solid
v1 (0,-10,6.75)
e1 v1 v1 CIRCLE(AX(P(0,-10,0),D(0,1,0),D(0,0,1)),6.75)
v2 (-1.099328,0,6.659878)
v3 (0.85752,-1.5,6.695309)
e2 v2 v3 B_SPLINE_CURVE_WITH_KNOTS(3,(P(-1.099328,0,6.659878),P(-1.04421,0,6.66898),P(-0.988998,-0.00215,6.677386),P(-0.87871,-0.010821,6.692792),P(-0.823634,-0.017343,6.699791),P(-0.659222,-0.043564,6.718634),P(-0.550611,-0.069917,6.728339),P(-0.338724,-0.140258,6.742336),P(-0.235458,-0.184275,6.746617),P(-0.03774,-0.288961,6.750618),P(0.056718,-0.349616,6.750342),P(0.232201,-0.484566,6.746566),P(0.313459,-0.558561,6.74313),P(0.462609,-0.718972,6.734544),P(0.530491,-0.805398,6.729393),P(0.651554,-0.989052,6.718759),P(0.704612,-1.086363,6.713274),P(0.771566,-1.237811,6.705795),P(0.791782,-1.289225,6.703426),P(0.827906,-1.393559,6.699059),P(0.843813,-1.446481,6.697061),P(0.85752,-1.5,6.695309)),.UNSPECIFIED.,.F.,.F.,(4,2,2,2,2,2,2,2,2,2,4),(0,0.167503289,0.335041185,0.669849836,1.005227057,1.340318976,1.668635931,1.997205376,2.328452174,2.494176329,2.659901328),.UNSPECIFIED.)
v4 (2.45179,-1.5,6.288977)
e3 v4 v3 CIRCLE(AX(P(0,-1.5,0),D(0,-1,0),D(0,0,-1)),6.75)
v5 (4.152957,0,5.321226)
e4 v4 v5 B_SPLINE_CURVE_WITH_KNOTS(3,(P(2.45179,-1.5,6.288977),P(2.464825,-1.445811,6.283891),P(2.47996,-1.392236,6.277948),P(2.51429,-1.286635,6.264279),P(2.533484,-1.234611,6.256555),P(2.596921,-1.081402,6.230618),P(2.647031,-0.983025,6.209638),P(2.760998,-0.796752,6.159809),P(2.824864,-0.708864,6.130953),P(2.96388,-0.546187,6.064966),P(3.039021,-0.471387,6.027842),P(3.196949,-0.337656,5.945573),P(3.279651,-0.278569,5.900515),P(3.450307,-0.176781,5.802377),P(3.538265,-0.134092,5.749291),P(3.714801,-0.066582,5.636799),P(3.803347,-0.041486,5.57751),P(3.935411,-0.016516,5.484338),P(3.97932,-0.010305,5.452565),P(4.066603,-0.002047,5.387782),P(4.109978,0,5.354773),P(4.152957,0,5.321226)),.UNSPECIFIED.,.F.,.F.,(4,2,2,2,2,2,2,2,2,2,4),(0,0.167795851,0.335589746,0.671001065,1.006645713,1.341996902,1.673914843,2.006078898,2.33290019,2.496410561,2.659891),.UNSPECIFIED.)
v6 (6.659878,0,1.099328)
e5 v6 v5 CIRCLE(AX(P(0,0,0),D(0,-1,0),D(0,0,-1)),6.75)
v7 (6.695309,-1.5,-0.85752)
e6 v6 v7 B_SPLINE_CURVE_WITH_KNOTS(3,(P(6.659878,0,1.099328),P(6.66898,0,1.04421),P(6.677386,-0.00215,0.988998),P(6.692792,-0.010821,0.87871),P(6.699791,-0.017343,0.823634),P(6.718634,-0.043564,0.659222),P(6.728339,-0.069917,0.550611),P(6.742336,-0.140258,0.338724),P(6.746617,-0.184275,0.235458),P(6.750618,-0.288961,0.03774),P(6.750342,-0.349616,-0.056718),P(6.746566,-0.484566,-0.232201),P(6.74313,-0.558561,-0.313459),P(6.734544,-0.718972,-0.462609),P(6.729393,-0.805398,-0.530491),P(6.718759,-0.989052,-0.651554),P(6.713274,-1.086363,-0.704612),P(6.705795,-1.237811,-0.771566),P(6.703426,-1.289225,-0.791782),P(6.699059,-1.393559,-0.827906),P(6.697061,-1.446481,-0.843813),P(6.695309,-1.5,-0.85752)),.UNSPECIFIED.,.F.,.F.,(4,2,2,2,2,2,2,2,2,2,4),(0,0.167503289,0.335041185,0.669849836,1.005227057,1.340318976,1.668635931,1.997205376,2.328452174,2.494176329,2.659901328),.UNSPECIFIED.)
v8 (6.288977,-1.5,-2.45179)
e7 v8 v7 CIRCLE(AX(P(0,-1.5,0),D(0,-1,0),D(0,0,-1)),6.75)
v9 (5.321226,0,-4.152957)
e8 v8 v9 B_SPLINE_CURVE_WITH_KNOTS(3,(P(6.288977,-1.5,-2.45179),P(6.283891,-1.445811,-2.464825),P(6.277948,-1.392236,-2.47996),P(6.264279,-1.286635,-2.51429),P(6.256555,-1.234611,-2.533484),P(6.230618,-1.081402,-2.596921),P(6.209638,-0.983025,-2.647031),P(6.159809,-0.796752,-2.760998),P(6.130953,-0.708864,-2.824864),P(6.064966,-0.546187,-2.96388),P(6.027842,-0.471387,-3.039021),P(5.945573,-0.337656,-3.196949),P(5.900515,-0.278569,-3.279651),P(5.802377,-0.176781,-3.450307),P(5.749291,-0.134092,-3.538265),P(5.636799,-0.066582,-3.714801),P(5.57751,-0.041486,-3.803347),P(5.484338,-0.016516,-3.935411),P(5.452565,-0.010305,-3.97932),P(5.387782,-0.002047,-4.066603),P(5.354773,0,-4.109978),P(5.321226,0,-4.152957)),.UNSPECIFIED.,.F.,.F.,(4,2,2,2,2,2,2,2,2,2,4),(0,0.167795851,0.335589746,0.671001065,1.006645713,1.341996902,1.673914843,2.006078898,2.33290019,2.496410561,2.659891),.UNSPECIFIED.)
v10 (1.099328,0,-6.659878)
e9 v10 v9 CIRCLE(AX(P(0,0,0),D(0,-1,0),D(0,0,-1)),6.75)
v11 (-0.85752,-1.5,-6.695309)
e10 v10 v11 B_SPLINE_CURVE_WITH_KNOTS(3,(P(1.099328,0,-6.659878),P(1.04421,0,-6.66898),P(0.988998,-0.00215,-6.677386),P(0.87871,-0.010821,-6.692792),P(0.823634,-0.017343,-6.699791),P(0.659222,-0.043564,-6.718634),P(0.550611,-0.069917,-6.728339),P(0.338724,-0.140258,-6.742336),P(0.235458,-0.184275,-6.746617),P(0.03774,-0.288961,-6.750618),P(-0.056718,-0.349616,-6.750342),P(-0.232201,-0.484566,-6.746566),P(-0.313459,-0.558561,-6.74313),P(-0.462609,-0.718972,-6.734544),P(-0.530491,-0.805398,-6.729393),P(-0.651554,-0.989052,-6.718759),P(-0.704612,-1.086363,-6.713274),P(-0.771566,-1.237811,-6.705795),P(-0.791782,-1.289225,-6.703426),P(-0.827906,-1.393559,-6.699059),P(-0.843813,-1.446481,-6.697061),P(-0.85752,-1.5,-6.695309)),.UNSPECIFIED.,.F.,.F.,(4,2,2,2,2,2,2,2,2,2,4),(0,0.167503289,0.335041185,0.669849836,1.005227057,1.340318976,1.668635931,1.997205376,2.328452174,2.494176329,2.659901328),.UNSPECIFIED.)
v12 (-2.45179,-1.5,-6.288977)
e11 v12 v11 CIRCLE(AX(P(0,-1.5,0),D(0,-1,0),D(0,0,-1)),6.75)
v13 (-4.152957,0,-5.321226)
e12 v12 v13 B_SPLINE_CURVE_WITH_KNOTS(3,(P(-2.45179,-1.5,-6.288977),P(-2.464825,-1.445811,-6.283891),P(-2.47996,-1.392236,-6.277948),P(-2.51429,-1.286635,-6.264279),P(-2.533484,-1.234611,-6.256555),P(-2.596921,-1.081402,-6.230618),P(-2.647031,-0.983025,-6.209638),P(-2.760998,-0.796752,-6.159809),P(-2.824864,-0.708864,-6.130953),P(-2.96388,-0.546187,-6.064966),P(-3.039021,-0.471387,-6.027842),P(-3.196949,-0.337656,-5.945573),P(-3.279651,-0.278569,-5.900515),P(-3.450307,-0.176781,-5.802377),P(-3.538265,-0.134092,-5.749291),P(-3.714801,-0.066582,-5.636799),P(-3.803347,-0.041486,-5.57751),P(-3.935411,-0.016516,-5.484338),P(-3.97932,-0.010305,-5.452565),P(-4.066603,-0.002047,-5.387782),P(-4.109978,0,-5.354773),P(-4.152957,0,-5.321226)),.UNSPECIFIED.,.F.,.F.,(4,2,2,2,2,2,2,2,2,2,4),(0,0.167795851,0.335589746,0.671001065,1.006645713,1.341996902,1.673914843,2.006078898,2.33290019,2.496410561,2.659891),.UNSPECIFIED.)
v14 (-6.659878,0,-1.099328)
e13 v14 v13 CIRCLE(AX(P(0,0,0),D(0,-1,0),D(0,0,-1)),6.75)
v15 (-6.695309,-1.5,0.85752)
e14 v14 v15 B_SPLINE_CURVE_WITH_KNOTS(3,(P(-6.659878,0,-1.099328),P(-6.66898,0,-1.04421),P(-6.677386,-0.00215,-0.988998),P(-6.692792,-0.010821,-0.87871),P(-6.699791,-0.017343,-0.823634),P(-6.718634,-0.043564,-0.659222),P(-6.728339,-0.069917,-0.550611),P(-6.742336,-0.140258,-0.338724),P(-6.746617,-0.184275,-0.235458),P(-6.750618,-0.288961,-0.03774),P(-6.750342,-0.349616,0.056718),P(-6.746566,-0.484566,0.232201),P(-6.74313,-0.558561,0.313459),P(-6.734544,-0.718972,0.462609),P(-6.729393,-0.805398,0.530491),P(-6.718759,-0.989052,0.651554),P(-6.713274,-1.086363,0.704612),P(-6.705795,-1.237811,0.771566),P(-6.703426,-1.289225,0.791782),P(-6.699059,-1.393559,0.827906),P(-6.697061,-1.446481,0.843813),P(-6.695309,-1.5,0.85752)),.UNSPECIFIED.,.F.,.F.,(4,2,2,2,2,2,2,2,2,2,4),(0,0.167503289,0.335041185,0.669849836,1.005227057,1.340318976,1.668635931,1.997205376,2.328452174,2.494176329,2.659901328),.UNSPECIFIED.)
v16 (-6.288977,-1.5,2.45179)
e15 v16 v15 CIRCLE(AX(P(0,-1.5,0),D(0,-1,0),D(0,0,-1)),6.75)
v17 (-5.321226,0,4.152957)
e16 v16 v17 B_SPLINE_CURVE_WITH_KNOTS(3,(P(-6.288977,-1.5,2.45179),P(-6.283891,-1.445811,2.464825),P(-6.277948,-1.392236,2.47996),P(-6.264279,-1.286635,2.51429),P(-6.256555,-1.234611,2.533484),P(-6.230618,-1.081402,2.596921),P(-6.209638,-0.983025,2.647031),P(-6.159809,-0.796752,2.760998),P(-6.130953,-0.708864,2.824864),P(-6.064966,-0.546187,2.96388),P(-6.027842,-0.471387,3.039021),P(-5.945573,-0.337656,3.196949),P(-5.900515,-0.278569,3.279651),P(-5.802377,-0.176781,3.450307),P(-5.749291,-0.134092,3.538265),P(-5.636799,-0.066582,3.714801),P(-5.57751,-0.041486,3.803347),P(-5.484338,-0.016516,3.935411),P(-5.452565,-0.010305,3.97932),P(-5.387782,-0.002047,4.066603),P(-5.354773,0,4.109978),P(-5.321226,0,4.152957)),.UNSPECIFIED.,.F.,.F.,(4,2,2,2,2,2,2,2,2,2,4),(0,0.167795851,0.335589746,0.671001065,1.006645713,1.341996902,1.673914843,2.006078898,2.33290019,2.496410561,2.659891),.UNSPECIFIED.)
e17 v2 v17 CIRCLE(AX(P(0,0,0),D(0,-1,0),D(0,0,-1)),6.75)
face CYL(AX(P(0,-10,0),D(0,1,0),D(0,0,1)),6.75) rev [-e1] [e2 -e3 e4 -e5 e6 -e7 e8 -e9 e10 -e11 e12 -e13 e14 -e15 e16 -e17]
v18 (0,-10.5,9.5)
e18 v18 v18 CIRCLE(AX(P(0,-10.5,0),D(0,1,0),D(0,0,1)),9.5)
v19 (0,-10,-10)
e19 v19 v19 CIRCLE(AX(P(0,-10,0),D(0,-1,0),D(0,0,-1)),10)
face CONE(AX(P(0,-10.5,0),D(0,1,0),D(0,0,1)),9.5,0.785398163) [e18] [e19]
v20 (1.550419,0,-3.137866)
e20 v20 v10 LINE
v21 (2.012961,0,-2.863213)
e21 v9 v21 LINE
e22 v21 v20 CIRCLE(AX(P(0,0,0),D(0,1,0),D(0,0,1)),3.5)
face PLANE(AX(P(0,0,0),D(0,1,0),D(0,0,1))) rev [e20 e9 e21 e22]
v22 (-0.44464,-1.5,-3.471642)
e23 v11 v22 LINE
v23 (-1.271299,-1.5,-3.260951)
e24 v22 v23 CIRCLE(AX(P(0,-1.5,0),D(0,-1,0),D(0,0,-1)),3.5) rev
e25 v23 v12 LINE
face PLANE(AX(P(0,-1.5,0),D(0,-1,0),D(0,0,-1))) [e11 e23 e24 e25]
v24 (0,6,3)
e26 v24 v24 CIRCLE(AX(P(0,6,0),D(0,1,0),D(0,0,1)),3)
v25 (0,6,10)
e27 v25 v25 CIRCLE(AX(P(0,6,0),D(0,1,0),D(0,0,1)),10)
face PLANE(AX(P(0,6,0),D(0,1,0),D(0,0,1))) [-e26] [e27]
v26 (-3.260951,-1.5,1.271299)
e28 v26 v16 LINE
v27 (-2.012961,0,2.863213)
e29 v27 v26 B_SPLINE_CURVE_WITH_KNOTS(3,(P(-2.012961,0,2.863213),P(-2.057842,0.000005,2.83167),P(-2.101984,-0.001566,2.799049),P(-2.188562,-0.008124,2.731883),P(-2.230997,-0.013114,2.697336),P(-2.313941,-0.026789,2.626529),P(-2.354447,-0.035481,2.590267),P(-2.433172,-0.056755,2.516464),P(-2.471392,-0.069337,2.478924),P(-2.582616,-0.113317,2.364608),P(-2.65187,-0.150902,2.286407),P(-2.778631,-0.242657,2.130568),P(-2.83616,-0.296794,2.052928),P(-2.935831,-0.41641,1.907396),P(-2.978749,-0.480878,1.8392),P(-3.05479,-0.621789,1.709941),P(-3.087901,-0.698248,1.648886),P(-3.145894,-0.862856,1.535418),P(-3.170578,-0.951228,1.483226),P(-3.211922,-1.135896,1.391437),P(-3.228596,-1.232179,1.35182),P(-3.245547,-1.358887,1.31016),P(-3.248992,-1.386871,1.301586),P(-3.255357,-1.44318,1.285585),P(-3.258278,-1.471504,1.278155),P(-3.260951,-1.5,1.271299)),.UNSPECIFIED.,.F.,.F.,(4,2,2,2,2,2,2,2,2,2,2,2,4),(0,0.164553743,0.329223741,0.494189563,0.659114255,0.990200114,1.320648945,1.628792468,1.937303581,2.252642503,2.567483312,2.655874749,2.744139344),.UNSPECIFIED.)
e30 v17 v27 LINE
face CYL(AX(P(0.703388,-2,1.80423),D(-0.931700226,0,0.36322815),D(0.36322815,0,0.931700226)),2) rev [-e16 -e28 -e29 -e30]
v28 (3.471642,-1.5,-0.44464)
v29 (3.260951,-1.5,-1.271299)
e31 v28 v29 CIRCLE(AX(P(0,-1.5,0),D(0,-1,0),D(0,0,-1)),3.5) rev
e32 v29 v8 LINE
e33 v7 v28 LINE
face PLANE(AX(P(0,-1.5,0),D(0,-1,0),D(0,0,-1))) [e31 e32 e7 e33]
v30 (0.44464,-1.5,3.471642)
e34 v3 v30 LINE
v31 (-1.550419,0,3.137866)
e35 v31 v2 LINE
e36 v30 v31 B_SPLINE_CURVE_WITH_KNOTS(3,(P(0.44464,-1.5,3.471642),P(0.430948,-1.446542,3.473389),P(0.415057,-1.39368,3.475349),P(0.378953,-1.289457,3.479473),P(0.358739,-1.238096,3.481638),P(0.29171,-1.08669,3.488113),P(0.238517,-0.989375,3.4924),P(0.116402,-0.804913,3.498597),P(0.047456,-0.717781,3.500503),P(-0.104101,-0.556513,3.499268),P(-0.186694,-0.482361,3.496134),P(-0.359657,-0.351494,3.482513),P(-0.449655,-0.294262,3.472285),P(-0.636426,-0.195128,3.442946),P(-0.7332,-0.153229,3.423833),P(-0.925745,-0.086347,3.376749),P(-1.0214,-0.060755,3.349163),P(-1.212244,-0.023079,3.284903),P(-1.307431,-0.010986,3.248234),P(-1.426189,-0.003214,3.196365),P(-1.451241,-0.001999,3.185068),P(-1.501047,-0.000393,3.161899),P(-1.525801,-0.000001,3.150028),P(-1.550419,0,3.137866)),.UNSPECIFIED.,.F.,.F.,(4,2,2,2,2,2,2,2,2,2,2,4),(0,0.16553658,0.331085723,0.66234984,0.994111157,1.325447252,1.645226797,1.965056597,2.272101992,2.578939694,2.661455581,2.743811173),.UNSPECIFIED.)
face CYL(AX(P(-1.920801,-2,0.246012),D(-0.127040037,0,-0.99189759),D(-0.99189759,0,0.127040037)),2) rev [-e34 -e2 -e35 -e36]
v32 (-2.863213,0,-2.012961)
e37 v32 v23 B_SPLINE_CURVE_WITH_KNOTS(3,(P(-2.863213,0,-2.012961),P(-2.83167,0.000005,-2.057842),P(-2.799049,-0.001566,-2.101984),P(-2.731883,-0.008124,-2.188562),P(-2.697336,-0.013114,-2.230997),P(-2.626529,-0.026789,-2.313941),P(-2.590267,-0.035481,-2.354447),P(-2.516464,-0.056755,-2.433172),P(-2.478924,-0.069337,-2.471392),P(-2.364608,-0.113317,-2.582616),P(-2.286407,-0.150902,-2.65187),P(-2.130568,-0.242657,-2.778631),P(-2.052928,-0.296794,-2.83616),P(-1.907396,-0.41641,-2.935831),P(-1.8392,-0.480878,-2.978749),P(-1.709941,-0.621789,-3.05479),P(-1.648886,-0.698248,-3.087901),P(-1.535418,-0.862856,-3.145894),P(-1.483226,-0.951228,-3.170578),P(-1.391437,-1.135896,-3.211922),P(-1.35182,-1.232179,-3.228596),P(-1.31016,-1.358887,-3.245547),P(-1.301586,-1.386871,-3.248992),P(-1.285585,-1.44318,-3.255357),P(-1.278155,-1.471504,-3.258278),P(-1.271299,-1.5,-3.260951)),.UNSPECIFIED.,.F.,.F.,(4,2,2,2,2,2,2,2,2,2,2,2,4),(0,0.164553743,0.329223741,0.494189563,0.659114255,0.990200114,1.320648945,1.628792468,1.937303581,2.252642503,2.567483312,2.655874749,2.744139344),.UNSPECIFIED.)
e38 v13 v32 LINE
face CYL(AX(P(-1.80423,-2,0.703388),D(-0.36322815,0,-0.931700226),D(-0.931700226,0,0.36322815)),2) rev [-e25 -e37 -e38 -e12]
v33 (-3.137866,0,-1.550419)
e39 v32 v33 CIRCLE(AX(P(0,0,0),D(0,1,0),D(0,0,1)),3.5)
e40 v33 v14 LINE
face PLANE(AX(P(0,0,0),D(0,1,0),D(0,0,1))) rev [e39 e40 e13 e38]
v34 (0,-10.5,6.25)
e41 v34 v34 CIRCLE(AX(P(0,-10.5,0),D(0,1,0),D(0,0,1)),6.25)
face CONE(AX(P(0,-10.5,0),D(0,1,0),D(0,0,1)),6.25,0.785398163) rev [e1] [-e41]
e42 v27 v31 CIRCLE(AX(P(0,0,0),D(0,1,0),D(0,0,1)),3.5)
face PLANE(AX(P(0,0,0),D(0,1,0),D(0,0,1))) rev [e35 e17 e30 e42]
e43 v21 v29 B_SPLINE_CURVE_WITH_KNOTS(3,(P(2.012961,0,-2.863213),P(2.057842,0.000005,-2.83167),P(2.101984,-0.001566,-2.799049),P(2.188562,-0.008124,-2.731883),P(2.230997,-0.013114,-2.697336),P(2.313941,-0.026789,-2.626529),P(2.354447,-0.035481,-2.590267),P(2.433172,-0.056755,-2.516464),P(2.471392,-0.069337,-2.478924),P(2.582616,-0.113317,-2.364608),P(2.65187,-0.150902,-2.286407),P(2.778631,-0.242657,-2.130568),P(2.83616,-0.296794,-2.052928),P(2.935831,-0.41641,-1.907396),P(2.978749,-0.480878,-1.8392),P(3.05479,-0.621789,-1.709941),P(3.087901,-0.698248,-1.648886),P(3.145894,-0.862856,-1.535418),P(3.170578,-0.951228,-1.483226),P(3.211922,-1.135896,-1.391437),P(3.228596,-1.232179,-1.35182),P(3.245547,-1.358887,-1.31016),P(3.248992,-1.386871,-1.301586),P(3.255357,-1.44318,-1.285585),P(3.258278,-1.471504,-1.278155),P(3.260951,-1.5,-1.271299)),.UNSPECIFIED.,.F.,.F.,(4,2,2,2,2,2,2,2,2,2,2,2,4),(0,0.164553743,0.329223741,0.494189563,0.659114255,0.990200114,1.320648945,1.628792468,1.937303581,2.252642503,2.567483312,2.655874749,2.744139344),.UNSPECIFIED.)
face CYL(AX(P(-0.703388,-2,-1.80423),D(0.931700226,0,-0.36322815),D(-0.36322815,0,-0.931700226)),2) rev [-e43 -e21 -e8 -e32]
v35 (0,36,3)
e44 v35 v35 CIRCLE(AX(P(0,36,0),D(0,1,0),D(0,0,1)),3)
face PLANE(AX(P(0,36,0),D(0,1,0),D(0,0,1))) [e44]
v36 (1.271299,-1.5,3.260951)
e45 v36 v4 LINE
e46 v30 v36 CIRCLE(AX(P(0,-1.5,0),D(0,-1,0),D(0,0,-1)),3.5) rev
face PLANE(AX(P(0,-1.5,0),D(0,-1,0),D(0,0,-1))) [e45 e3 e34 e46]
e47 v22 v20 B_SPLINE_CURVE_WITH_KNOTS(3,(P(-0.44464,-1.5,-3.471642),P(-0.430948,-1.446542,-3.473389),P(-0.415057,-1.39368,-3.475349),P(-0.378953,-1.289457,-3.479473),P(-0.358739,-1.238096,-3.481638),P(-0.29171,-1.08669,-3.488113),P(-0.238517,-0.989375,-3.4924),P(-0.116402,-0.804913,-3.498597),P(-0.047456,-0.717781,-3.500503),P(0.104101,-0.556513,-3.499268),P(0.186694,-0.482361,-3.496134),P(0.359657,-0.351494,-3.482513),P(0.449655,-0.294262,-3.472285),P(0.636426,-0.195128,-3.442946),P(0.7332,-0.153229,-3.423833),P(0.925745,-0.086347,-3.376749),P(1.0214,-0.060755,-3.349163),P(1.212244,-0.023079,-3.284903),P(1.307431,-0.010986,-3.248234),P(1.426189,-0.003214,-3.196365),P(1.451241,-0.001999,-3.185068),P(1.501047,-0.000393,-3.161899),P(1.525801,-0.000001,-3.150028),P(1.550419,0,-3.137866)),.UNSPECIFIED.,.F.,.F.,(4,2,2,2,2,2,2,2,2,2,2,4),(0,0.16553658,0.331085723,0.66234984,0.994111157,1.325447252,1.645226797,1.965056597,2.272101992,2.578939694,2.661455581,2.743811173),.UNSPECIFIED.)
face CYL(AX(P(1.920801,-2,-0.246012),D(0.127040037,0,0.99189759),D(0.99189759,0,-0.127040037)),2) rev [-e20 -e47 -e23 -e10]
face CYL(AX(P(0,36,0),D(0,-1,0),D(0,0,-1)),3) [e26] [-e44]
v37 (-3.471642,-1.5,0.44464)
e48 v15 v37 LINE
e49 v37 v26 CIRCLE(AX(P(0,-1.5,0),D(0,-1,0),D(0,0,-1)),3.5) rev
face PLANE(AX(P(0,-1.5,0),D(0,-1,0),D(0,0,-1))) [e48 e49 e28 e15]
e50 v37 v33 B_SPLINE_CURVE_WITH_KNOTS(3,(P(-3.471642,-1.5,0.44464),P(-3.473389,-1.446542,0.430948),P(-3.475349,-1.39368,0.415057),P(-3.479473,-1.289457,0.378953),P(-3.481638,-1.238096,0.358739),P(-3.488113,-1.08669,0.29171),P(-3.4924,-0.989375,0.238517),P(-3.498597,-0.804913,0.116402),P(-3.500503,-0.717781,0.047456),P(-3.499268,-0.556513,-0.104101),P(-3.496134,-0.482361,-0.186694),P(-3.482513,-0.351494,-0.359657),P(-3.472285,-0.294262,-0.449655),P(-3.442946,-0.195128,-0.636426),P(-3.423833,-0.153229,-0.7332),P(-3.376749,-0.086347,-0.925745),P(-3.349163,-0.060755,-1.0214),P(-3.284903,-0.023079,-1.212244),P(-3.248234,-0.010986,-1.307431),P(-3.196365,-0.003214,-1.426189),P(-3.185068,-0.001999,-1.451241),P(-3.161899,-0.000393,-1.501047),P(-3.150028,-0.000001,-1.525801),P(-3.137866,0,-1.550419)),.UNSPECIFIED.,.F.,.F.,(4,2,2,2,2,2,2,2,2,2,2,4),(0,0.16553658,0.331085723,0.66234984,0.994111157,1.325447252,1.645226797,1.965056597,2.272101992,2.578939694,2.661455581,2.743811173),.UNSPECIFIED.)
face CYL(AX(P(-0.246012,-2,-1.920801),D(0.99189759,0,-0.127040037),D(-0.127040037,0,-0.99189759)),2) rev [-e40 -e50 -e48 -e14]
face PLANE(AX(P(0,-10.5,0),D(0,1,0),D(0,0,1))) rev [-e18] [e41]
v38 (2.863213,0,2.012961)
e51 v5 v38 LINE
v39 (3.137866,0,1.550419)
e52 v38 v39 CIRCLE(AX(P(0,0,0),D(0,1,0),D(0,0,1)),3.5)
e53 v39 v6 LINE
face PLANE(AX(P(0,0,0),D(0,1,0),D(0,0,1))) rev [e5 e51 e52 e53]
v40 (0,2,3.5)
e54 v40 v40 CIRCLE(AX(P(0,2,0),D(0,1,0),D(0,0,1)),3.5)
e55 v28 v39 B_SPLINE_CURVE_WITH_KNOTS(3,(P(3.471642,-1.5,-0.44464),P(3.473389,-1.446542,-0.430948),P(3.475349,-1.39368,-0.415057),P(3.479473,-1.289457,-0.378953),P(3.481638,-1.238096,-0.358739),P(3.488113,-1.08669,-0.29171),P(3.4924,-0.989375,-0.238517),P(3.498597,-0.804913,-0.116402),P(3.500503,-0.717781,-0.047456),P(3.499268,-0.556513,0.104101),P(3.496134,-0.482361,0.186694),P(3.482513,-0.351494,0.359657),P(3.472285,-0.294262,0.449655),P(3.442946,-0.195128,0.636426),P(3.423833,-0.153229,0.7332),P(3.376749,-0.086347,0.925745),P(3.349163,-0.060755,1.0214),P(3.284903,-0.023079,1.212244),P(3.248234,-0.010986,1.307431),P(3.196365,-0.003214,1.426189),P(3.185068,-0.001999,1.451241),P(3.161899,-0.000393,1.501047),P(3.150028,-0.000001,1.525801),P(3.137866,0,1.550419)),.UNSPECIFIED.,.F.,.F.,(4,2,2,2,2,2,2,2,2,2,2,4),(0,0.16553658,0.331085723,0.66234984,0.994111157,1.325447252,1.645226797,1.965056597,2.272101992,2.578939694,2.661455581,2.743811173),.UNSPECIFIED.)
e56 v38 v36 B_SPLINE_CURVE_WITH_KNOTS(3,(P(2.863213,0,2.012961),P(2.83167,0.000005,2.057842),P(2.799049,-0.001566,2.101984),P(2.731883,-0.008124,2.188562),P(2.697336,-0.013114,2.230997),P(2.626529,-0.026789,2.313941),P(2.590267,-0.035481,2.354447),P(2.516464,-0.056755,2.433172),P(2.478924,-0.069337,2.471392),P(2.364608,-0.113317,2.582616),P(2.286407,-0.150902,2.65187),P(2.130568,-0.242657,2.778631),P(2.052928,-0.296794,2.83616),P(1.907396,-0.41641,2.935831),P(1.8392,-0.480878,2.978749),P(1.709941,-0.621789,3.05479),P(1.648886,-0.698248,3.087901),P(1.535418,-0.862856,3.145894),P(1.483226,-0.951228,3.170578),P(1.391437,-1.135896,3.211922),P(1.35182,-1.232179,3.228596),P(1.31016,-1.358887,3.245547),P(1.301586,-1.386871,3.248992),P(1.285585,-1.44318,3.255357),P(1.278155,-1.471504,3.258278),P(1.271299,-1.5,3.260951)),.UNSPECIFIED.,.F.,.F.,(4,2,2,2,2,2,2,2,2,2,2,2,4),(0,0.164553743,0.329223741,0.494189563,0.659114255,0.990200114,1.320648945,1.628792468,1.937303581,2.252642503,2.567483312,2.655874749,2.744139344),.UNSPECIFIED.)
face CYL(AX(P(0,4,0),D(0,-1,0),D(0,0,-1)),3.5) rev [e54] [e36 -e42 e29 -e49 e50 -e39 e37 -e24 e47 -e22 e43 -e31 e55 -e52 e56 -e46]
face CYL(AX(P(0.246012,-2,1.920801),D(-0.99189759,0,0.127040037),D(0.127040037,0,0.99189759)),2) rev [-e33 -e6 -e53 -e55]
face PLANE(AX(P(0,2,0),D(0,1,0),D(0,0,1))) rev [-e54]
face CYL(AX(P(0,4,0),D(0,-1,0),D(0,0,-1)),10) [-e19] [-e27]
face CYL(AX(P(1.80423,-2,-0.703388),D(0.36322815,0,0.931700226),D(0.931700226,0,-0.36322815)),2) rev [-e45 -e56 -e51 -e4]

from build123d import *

# Parameters (mm, degrees)
ESQUISSE1_R        = 10
ESQUISSE1_R_2      = 3.5
BOSS_EXTRU_1_DEPTH = 4
BOSS_EXTRU_2_START = 10
ESQUISSE2_R        = 10
ESQUISSE2_R_2      = 6.75
BOSS_EXTRU_2_DEPTH = 10
BOSS_EXTRU_3_START = 1.5
BOSS_EXTRU_3_DEPTH = 1.5
CONG_1_R           = 2
BOSS_EXTRU_6_START = -2
ESQUISSE13_R       = 3.5
BOSS_EXTRU_6_DEPTH = 2
ESQUISSE15_R       = 10
BOSS_EXTRU_7_DEPTH = 2
ESQUISSE21_R       = 3
BOSS_EXTRU_8_DEPTH = 30


with BuildPart() as part:
    # Esquisse1 → Boss.-Extru.1 (new body)
    with BuildSketch(Plane(origin=(0, 0, 0), x_dir=(1, 0, 0), z_dir=(0, 1, 0))):
        with Locations(Location((0, 0, 0), (0, 0, 270))):
            Circle(ESQUISSE1_R)
        with Locations(Location((0, 0, 0), (0, 0, 270))):
            Circle(ESQUISSE1_R_2, mode=Mode.SUBTRACT)
    extrude(amount=BOSS_EXTRU_1_DEPTH)

    # Esquisse2 → Boss.-Extru.2 (add)
    with BuildSketch(Plane.XZ.offset(BOSS_EXTRU_2_START)):
        with Locations(Location((0, 0, 0), (0, 0, 270))):
            Circle(ESQUISSE2_R)
        with Locations(Location((0, 0, 0), (0, 0, 270))):
            Circle(ESQUISSE2_R_2, mode=Mode.SUBTRACT)
    extrude(amount=-BOSS_EXTRU_2_DEPTH)

    # Esquisse5 → Révolution2 (revolve)
    with BuildSketch(Plane(origin=(0, 0, 0), x_dir=(0, 0, -1), z_dir=(1, 0, 0))):
        Polygon((-10, -10), (-6.75, -10), (-6.250000000000001, -10.499999999999995), (-9.500000000000004, -10.499999999999993), align=None)
    revolve(axis=Axis((0, 0, 0), (0, -1, 0)))

    # Esquisse7 → Boss.-Extru.3 (add)
    with BuildSketch(Plane.XZ.offset(BOSS_EXTRU_3_START)):
        with BuildLine():
            ThreePointArc((-3.471641565041511, 0.4446401285040917), (-3.3915764747476542, 0.8644125264815606), (-3.260950790974577, 1.2712985246755686))
            Line((-3.260950790974577, 1.2712985246755686), (-6.288976525451004, 2.4517900118742246))
            ThreePointArc((-6.288976525451004, 2.4517900118742246), (-6.54089748701339, 1.6670813010714052), (-6.695308732580065, 0.8575202478290395))
            Line((-6.695308732580065, 0.8575202478290395), (-3.471641565041511, 0.4446401285040917))
        make_face()
        with BuildLine():
            ThreePointArc((-0.44464012850385526, -3.47164156504154), (-0.8644125264814398, -3.3915764747476906), (-1.2712985246755584, -3.2609507909745816))
            Line((-1.271298524675558, -3.2609507909745803), (-2.4517900118740936, -6.288976525450949))
            ThreePointArc((-2.4517900118740936, -6.28897652545095), (-1.6670813010712728, -6.54089748701333), (-0.8575202478289087, -6.69530873258001))
            Line((-0.8575202478289086, -6.695308732580009), (-0.4446401285038535, -3.4716415650415393))
        make_face()
        with BuildLine():
            ThreePointArc((3.4716415650415344, -0.44464012850390167), (3.391576474747708, -0.8644125264813738), (3.2609507909746505, -1.271298524675382))
            Line((3.2609507909746522, -1.2712985246753834), (6.288976525451078, -2.4517900118740386))
            ThreePointArc((6.288976525451079, -2.451790011874039), (6.540897487013439, -1.6670813010712129), (6.69530873258014, -0.8575202478288542))
            Line((6.6953087325801395, -0.8575202478288538), (3.471641565041585, -0.4446401285039065))
        make_face()
        with BuildLine():
            Line((0.857520247828984, 6.6953087325801945), (0.44464012850403645, 3.4716415650416406))
            ThreePointArc((0.44464012850402057, 3.4716415650415193), (0.8644125264815102, 3.391576474747673), (1.2712985246755357, 3.2609507909745905))
            Line((1.2712985246755355, 3.26095079097459), (2.4517900118741687, 6.288976525451134))
            ThreePointArc((2.4517900118741687, 6.288976525451133), (1.6670813010713434, 6.540897487013499), (0.857520247828984, 6.6953087325801945))
        make_face()
    extrude(amount=-BOSS_EXTRU_3_DEPTH)

    # Congé1
    # the kernel refuses this fillet: 2 mm, written as the material it adds along each edge
    with BuildSketch(Plane(origin=(-11.497312291654126, 0, 1.472550180954296), x_dir=(-0.1270400367153696, 0, -0.9918975900118709), z_dir=(0.9918975900118709, 0, -0.1270400367153696))) as cong_1_piece_1_section:
        with BuildLine():
            CenterArc((1.9364916731037083, -2), CONG_1_R, 90, 75.5224878140701)
            Line((-2.2e-16, -1.5), (0, 0))
            Line((0, 0), (1.9364916731037083, 0))
        make_face()
    cong_1_piece_1 = extrude(amount=12.932458365518517, mode=Mode.PRIVATE)
    cong_1_piece_1 = cong_1_piece_1 - Plane(origin=(0, 0, 0), x_dir=(-1.8e-16, 0, 1), z_dir=(0, -1, 0)) * Cylinder(3.5, 34, mode=Mode.PRIVATE)
    cong_1_piece_1 = cong_1_piece_1 & Plane(origin=(0, 0, 0), x_dir=(-1.8e-16, 0, -1), z_dir=(0, -1, 0)) * Cylinder(6.75, 34, mode=Mode.PRIVATE)
    add(cong_1_piece_1)
    with BuildSketch(Plane(origin=(1.2496235326849163, 0, -0.4871721946552088), x_dir=(0.3632281499072788, 0, 0.9317002259927467), z_dir=(-0.9317002259927468, 0, 0.3632281499072788))) as cong_1_piece_2_section:
        with BuildLine():
            CenterArc((1.9364916731037085, -2), CONG_1_R, 90, 75.5224878140701)
            Line((0, -1.5), (0, 0))
            Line((0, 0), (1.9364916731037085, 0))
        make_face()
    cong_1_piece_2 = extrude(amount=12.932458365518542, mode=Mode.PRIVATE)
    cong_1_piece_2 = cong_1_piece_2 - Plane(origin=(0, 0, 0), x_dir=(-1.8e-16, 0, 1), z_dir=(0, -1, 0)) * Cylinder(3.5, 34, mode=Mode.PRIVATE)
    cong_1_piece_2 = cong_1_piece_2 & Plane(origin=(0, 0, 0), x_dir=(-1.8e-16, 0, -1), z_dir=(0, -1, 0)) * Cylinder(6.75, 34, mode=Mode.PRIVATE)
    add(cong_1_piece_2)
    with BuildSketch(Plane(origin=(-1.4725501809543382, 0, -11.497312291654048), x_dir=(0.9918975900118664, 0, -0.12704003671540534), z_dir=(0.12704003671540534, 0, 0.9918975900118664))) as cong_1_piece_3_section:
        with BuildLine():
            CenterArc((1.9364916731037087, -2.0000000000000004), CONG_1_R, 90, 75.5224878140701)
            Line((0, -1.5000000000000004), (0, 0))
            Line((0, 0), (1.9364916731037087, 0))
        make_face()
    cong_1_piece_3 = extrude(amount=12.932458365518444, mode=Mode.PRIVATE)
    cong_1_piece_3 = cong_1_piece_3 - Plane(origin=(0, 0, 0), x_dir=(-1.8e-16, 0, 1), z_dir=(0, -1, 0)) * Cylinder(3.5, 34, mode=Mode.PRIVATE)
    cong_1_piece_3 = cong_1_piece_3 & Plane(origin=(0, 0, 0), x_dir=(-1.8e-16, 0, -1), z_dir=(0, -1, 0)) * Cylinder(6.75, 34, mode=Mode.PRIVATE)
    add(cong_1_piece_3)
    with BuildSketch(Plane(origin=(0.4871721946550931, 0, 1.2496235326849625), x_dir=(-0.9317002259927569, 0, 0.3632281499072527), z_dir=(-0.3632281499072527, 0, -0.931700225992757))) as cong_1_piece_4_section:
        with BuildLine():
            CenterArc((1.9364916731037085, -2), CONG_1_R, 90, 75.5224878140701)
            Line((0, -1.5), (0, 0))
            Line((0, 0), (1.9364916731037085, 0))
        make_face()
    cong_1_piece_4 = extrude(amount=12.932458365518446, mode=Mode.PRIVATE)
    cong_1_piece_4 = cong_1_piece_4 - Plane(origin=(0, 0, 0), x_dir=(-1.8e-16, 0, 1), z_dir=(0, -1, 0)) * Cylinder(3.5, 34, mode=Mode.PRIVATE)
    cong_1_piece_4 = cong_1_piece_4 & Plane(origin=(0, 0, 0), x_dir=(-1.8e-16, 0, -1), z_dir=(0, -1, 0)) * Cylinder(6.75, 34, mode=Mode.PRIVATE)
    add(cong_1_piece_4)
    with BuildSketch(Plane(origin=(11.4973122916542, 0, -1.4725501809541097), x_dir=(0.12704003671536943, 0, 0.9918975900118709), z_dir=(-0.991897590011871, 0, 0.12704003671536945))) as cong_1_piece_5_section:
        with BuildLine():
            CenterArc((1.9364916731037083, -2.0000000000000004), CONG_1_R, 90, 75.5224878140701)
            Line((-2.2e-16, -1.5000000000000004), (0, 0))
            Line((0, 0), (1.9364916731037083, 0))
        make_face()
    cong_1_piece_5 = extrude(amount=12.932458365518519, mode=Mode.PRIVATE)
    cong_1_piece_5 = cong_1_piece_5 - Plane(origin=(0, 0, 0), x_dir=(-1.8e-16, 0, 1), z_dir=(0, -1, 0)) * Cylinder(3.5, 34, mode=Mode.PRIVATE)
    cong_1_piece_5 = cong_1_piece_5 & Plane(origin=(0, 0, 0), x_dir=(-1.8e-16, 0, -1), z_dir=(0, -1, 0)) * Cylinder(6.75, 34, mode=Mode.PRIVATE)
    add(cong_1_piece_5)
    with BuildSketch(Plane(origin=(-1.2496235326848435, 0, 0.4871721946553944), x_dir=(-0.3632281499072787, 0, -0.9317002259927468), z_dir=(0.9317002259927469, 0, -0.3632281499072787))) as cong_1_piece_6_section:
        with BuildLine():
            CenterArc((1.936491673103709, -2), CONG_1_R, 90, 75.5224878140701)
            Line((2.1e-16, -1.5), (0, 0))
            Line((0, 0), (1.936491673103709, 0))
        make_face()
    cong_1_piece_6 = extrude(amount=12.932458365518547, mode=Mode.PRIVATE)
    cong_1_piece_6 = cong_1_piece_6 - Plane(origin=(0, 0, 0), x_dir=(-1.8e-16, 0, 1), z_dir=(0, -1, 0)) * Cylinder(3.5, 34, mode=Mode.PRIVATE)
    cong_1_piece_6 = cong_1_piece_6 & Plane(origin=(0, 0, 0), x_dir=(-1.8e-16, 0, -1), z_dir=(0, -1, 0)) * Cylinder(6.75, 34, mode=Mode.PRIVATE)
    add(cong_1_piece_6)
    with BuildSketch(Plane(origin=(1.4725501809542403, 0, 11.497312291654257), x_dir=(-0.9918975900118709, 0, 0.1270400367153695), z_dir=(-0.1270400367153695, 0, -0.9918975900118709))) as cong_1_piece_7_section:
        with BuildLine():
            CenterArc((1.936491673103709, -2), CONG_1_R, 90, 75.5224878140701)
            Line((2.2e-16, -1.5), (0, 0))
            Line((0, 0), (1.936491673103709, 0))
        make_face()
    cong_1_piece_7 = extrude(amount=12.93245836551852, mode=Mode.PRIVATE)
    cong_1_piece_7 = cong_1_piece_7 - Plane(origin=(0, 0, 0), x_dir=(-1.8e-16, 0, 1), z_dir=(0, -1, 0)) * Cylinder(3.5, 34, mode=Mode.PRIVATE)
    cong_1_piece_7 = cong_1_piece_7 & Plane(origin=(0, 0, 0), x_dir=(-1.8e-16, 0, -1), z_dir=(0, -1, 0)) * Cylinder(6.75, 34, mode=Mode.PRIVATE)
    add(cong_1_piece_7)
    with BuildSketch(Plane(origin=(-0.4871721946551535, 0, -1.2496235326849385), x_dir=(0.9317002259927538, 0, -0.3632281499072605), z_dir=(0.36322814990726054, 0, 0.931700225992754))) as cong_1_piece_8_section:
        with BuildLine():
            CenterArc((1.9364916731037085, -2), CONG_1_R, 90, 75.5224878140701)
            Line((0, -1.5), (0, 0))
            Line((0, 0), (1.9364916731037085, 0))
        make_face()
    cong_1_piece_8 = extrude(amount=12.932458365518647, mode=Mode.PRIVATE)
    cong_1_piece_8 = cong_1_piece_8 - Plane(origin=(0, 0, 0), x_dir=(-1.8e-16, 0, 1), z_dir=(0, -1, 0)) * Cylinder(3.5, 34, mode=Mode.PRIVATE)
    cong_1_piece_8 = cong_1_piece_8 & Plane(origin=(0, 0, 0), x_dir=(-1.8e-16, 0, -1), z_dir=(0, -1, 0)) * Cylinder(6.75, 34, mode=Mode.PRIVATE)
    add(cong_1_piece_8)

    # Esquisse13 → Boss.-Extru.6 (add)
    with BuildSketch(Plane(origin=(0, 4, 0), x_dir=(1, 0, 0), z_dir=(0, 1, 0)).offset(BOSS_EXTRU_6_START)):
        with Locations(Location((0, 0, 0), (0, 0, 97.298580632))):
            Circle(ESQUISSE13_R)
    extrude(amount=BOSS_EXTRU_6_DEPTH)

    # Esquisse15 → Boss.-Extru.7 (add)
    with BuildSketch(Plane(origin=(0, 4, 0), x_dir=(1, 0, 0), z_dir=(0, 1, 0))):
        with Locations(Location((0, 0, 0), (0, 0, 90))):
            Circle(ESQUISSE15_R)
    extrude(amount=BOSS_EXTRU_7_DEPTH)

    # Esquisse21 → Boss.-Extru.8 (add)
    with BuildSketch(Plane(origin=(0, 6, 0), x_dir=(1, 0, 0), z_dir=(0, 1, 0))):
        with Locations(Location((0, 0, 0), (0, 0, 270))):
            Circle(ESQUISSE21_R)
    extrude(amount=BOSS_EXTRU_8_DEPTH)


solid = part.part
